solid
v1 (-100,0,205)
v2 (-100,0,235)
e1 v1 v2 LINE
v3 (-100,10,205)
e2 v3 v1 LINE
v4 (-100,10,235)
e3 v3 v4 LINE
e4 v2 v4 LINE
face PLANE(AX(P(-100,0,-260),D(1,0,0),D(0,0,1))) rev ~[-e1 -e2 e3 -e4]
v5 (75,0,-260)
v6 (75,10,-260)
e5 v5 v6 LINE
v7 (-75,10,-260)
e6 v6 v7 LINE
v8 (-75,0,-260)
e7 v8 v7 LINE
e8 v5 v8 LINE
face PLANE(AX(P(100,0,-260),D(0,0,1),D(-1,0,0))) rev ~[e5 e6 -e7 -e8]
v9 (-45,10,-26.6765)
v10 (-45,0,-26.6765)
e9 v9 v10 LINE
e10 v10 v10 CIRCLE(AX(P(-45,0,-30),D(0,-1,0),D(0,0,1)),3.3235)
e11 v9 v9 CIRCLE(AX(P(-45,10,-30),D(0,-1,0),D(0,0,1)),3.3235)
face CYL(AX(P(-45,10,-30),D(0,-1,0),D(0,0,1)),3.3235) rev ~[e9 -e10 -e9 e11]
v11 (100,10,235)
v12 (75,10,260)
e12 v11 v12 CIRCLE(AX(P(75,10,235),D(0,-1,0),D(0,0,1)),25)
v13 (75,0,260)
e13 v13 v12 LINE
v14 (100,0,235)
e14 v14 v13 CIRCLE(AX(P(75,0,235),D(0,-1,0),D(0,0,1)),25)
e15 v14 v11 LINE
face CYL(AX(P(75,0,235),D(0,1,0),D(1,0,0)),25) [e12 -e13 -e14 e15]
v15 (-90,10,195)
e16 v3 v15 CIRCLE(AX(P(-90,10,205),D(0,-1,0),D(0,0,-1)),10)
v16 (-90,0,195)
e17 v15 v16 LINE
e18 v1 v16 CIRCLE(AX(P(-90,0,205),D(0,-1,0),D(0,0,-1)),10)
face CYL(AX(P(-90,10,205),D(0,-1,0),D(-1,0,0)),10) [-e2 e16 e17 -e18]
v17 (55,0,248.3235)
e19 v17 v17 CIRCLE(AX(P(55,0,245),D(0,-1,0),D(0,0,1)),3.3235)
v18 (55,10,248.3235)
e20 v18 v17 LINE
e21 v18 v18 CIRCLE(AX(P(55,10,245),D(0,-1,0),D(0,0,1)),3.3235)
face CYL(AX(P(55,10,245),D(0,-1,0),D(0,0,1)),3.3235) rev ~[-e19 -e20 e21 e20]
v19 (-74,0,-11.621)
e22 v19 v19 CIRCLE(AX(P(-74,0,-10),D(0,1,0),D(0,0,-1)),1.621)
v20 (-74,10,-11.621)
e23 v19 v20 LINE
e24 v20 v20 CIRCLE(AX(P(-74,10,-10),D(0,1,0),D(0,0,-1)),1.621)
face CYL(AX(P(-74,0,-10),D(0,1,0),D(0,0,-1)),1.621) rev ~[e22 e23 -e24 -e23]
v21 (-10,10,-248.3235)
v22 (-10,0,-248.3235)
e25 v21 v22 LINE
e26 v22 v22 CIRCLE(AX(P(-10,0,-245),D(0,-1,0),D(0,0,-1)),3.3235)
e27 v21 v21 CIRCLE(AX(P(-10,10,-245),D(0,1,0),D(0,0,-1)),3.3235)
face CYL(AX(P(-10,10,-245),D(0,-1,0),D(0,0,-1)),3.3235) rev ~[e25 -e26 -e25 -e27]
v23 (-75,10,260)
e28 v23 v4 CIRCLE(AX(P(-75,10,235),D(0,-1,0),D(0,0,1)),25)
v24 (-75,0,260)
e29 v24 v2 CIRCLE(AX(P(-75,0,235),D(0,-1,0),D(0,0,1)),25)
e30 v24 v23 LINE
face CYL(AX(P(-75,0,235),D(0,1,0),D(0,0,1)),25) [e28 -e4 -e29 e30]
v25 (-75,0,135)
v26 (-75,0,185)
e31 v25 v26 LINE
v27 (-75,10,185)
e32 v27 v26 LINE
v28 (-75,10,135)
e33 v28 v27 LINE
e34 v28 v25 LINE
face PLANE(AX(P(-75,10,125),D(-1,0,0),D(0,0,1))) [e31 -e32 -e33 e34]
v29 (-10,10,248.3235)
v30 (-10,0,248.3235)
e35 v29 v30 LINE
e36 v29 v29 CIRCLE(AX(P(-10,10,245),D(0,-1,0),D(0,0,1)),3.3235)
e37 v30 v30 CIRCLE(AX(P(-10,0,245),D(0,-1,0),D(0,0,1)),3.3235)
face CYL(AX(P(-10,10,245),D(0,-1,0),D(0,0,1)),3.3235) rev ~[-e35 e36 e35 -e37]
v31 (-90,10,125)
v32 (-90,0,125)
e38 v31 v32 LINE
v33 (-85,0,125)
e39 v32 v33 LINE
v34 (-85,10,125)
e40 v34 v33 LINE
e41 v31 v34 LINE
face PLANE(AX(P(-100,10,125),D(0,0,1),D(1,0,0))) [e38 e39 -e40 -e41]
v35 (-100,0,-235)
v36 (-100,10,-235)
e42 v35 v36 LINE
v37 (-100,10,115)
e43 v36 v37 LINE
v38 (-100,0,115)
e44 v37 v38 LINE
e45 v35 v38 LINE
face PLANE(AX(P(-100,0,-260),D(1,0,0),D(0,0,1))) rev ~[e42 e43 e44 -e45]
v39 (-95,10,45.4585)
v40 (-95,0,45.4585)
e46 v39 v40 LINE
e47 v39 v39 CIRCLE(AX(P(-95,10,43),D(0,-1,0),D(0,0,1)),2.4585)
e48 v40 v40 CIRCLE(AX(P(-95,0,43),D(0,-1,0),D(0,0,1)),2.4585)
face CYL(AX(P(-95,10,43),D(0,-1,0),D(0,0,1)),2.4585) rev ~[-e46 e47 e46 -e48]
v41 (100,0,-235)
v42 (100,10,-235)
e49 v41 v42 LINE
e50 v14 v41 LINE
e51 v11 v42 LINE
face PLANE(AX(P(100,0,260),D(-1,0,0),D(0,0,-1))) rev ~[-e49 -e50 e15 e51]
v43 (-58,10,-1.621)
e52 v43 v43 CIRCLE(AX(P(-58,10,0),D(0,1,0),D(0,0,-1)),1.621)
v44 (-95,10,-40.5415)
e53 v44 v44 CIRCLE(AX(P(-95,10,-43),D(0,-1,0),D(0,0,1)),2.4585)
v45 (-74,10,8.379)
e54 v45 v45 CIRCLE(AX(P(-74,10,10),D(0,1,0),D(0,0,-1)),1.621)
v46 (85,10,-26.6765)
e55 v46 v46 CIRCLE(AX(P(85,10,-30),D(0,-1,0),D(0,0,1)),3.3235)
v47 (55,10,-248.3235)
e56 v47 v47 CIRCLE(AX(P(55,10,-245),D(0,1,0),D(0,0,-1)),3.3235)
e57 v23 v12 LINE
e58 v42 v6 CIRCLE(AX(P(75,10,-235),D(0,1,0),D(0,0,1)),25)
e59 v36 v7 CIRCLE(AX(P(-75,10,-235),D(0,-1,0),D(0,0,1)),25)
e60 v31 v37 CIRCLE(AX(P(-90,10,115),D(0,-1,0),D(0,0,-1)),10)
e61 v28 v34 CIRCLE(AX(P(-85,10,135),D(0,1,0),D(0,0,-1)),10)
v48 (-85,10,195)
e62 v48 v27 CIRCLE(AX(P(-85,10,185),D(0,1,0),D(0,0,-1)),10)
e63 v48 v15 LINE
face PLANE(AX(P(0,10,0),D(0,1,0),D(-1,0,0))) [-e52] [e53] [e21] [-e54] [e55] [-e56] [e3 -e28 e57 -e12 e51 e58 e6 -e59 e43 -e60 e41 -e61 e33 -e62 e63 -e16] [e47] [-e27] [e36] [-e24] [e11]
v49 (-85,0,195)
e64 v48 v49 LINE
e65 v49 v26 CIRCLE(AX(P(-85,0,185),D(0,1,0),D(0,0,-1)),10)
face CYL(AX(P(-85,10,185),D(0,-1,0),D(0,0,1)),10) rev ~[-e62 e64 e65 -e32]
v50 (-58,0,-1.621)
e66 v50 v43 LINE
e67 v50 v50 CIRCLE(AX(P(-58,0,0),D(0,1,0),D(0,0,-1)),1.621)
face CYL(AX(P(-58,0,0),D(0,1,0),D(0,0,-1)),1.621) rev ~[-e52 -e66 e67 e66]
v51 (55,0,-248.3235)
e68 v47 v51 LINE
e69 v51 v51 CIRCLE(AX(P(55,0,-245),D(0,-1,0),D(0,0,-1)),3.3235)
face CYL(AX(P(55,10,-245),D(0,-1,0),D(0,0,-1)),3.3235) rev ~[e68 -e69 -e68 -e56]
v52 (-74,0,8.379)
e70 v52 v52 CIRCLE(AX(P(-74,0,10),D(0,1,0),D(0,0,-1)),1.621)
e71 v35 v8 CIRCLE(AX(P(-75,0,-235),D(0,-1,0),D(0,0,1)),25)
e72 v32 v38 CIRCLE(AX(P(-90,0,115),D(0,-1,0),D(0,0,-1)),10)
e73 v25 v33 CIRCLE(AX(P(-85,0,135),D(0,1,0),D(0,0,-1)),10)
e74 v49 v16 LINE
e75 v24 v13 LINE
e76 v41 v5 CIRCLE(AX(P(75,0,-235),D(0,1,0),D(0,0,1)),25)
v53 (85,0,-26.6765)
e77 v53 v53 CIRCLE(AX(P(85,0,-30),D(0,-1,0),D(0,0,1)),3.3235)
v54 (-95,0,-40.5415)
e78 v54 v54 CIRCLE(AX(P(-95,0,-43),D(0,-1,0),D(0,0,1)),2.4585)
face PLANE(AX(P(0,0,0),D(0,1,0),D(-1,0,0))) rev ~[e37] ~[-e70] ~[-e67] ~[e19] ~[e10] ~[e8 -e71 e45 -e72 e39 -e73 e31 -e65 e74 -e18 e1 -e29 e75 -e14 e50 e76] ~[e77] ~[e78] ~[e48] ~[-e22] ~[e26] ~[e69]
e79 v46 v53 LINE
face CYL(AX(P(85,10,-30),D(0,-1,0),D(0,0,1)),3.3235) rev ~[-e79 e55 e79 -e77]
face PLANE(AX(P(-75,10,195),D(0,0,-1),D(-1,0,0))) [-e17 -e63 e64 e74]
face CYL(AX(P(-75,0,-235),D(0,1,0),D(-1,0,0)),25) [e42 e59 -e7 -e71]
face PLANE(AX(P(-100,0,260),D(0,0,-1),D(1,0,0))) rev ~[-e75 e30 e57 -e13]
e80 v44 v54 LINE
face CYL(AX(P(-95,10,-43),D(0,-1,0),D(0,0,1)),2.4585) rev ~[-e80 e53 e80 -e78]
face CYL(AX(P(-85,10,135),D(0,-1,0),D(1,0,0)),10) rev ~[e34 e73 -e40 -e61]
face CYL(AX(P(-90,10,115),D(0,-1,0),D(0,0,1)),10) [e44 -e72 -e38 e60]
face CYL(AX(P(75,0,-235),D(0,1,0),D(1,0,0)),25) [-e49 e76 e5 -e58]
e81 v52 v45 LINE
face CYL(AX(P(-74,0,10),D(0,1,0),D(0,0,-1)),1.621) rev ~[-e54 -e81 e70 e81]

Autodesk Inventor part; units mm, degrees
ref_plane "YZ Plane" through (0, 0, 0) normal (1, 0, 0) x (0, 1, 0)
ref_plane "XZ Plane" through (0, 0, 0) normal (0, 1, 0) x (-1, 0, 0)
ref_plane "XY Plane" through (0, 0, 0) normal (0, 0, 1) x (1, 0, 0)
sketch "Sketch1" plane through (0, 0, 0) normal (0, 1, 0) x (-1, 0, 0)
  line L0 (-100, -260) -> (100, -260)
  line L1 (100, -260) -> (100, 260)
  line L2 (100, 260) -> (-100, 260)
  line L3 (-100, 260) -> (-100, -260)
  line L4 (-100, -260) -> (100, 260) construction
  line L5 (100, -260) -> (-100, 260) construction
  point P0 (0, 0)
  dimension "d0" = 200
  dimension "d1" = 520
extrude "Extrusion1" add sketch "Sketch1" along normal blind 10
fillet "Fillet1" radius 25 4 edges at (-100, 5, -260) (-100, 5, 260) (100, 5, 260) (100, 5, -260)
sketch "Sketch3" plane through (0, 10, 0) normal (0, 1, 0) x (1, 0, 0)
  line L0 (-75, -260) -> (75, -260) projected
  line L1 (-100, 235) -> (-100, -235) projected
  point P0 (0, 0)
  point P1 (-10, -245)
  point P2 (55, -245)
  dimension "d20" = 15
  dimension "d21" = 90
  dimension "d22" = 65
  dimension "d23" = 15
hole "Hole2" at (-10, 10, 245) at (55, 10, 245) direction (0, -1, 0) diameter 6.647 end through all thread size "M8x1.25" class "6H" standard "ISO Metric profile"
mirror "Mirror1" about plane through (0, 0, 0) normal (0, 0, 1) of "Hole2"
sketch "Sketch4" plane through (0, 10, 0) normal (0, 1, 0) x (1, 0, 0)
  line L0 (75, 260) -> (-75, 260) projected
  line L1 (100, -235) -> (100, 235) projected
  point P0 (0, 0)
  point P1 (-45, 30)
  point P2 (85, 30)
  dimension "d31" = 230
  dimension "d32" = 145
  dimension "d33" = 230
  dimension "d34" = 15
hole "Hole3" at (-45, 10, -30) at (85, 10, -30) direction (0, -1, 0) diameter 6.647 end through all thread size "M8x1.25" class "6H" standard "ISO Metric profile"
sketch "Sketch12" plane through (0, 0, 0) normal (0, -1, 0) x (1, 0, 0)
  line L0 (0, 0) -> (-38.9736, 0) construction
  line L1 (-100, -235) -> (-100, 235) construction
  point P0 (-74, 10)
  point P1 (-74, -10)
  point P2 (-58, 0)
  dimension "d109" = 10
  dimension "d110" = 26
  dimension "d111" = 16
hole "Hole8" at (-74, 0, 10) at (-74, 0, -10) at (-58, 0, 0) direction (0, 1, 0) diameter 3.242 end through all thread size "M4x0.7" class "6H" standard "ISO Metric profile"
sketch "Sketch8" plane through (0, 10, 0) normal (0, 1, 0) x (1, 0, 0)
  line L0 (-100, 235) -> (-100, -235) projected
  line L1 (-100, -125) -> (-75, -125)
  line L2 (-75, -125) -> (-75, -195)
  line L3 (-75, -195) -> (-100, -195)
  line L4 (-100, -195) -> (-100, -125)
  line L5 (-75, -260) -> (75, -260) projected
  point P0 (0, 0)
  dimension "d72" = 25
  dimension "d73" = 70
  dimension "d74" = 65
extrude "Extrusion2" cut sketch "Sketch8" against normal blind 10
fillet "Fillet2" radius 10 4 edges at (-100, 5, 125) (-75, 5, 125) (-100, 5, 195) (-75, 5, 195)
sketch "Sketch13" plane through (0, 10, 0) normal (0, 1, 0) x (1, 0, 0)
  line L0 (-100, 235) -> (-100, -115) construction
  line L1 (-100, 0) -> (0, 0) construction
  point P0 (-95, -43)
  point P1 (-95, 43)
  dimension "d119" = 86
  dimension "d120" = 5
hole "Hole9" at (-95, 10, 43) at (-95, 10, -43) direction (0, -1, 0) diameter 4.917 end through all thread size "M6x1" class "6H" standard "ISO Metric profile"
sketch "Sketch9" plane through (0, 10, 0) normal (0, 1, 0) x (1, 0, 0)
  line L0 (-90, 55) -> (-100, 55)
  line L1 (-100, 55) -> (-100, -55)
  line L2 (-100, -55) -> (-90, -55)
  line L3 (-90, -55) -> (-90, 55)
  line L4 (-100, 235) -> (-100, -115) projected
  line L5 (75, 260) -> (-75, 260) projected
  line L6 (0, 0) -> (-100, 0) construction
  dimension "d78" = 10
  dimension "d79" = 110
  dimension "d80" = 0
sketch "Sketch10" plane through (0, 10, 0) normal (0, 1, 0) x (1, 0, 0)
  line L0 (-30, 180) -> (-60, 180)
  line L1 (-60, 180) -> (-60, 110)
  line L2 (-60, 110) -> (-30, 110)
  line L3 (-30, 110) -> (-30, 180)
  line L4 (-100, 235) -> (-100, -115) projected
  line L5 (75, 260) -> (-75, 260) projected
  point P0 (0, 0)
  dimension "d85" = 30
  dimension "d86" = 70
  dimension "d87" = 40
  dimension "d88" = 80
sketch "Sketch11" plane through (0, 10, 0) normal (0, 1, 0) x (1, 0, 0)
  line L0 (-100, 235) -> (-100, -115) projected
  line L1 (-100, -205) -> (-100, -235) projected
  line L2 (75, 260) -> (-75, 260) projected
  line L3 (-75, -260) -> (75, -260) projected
  point P0 (0, 0)
  point P1 (-50, 220)
  point P2 (-50, 70)
  point P3 (-50, -80)
  point P4 (-50, -155)
  point P5 (-50, -230)
  dimension "d92" = 50
  dimension "d93" = 50
  dimension "d94" = 50
  dimension "d95" = 50
  dimension "d96" = 50
  dimension "d97" = 40
  dimension "d98" = 190
  dimension "d99" = 180
  dimension "d100" = 105
  dimension "d101" = 30
properties part number "Top_plate" material "Stainless Steel"
